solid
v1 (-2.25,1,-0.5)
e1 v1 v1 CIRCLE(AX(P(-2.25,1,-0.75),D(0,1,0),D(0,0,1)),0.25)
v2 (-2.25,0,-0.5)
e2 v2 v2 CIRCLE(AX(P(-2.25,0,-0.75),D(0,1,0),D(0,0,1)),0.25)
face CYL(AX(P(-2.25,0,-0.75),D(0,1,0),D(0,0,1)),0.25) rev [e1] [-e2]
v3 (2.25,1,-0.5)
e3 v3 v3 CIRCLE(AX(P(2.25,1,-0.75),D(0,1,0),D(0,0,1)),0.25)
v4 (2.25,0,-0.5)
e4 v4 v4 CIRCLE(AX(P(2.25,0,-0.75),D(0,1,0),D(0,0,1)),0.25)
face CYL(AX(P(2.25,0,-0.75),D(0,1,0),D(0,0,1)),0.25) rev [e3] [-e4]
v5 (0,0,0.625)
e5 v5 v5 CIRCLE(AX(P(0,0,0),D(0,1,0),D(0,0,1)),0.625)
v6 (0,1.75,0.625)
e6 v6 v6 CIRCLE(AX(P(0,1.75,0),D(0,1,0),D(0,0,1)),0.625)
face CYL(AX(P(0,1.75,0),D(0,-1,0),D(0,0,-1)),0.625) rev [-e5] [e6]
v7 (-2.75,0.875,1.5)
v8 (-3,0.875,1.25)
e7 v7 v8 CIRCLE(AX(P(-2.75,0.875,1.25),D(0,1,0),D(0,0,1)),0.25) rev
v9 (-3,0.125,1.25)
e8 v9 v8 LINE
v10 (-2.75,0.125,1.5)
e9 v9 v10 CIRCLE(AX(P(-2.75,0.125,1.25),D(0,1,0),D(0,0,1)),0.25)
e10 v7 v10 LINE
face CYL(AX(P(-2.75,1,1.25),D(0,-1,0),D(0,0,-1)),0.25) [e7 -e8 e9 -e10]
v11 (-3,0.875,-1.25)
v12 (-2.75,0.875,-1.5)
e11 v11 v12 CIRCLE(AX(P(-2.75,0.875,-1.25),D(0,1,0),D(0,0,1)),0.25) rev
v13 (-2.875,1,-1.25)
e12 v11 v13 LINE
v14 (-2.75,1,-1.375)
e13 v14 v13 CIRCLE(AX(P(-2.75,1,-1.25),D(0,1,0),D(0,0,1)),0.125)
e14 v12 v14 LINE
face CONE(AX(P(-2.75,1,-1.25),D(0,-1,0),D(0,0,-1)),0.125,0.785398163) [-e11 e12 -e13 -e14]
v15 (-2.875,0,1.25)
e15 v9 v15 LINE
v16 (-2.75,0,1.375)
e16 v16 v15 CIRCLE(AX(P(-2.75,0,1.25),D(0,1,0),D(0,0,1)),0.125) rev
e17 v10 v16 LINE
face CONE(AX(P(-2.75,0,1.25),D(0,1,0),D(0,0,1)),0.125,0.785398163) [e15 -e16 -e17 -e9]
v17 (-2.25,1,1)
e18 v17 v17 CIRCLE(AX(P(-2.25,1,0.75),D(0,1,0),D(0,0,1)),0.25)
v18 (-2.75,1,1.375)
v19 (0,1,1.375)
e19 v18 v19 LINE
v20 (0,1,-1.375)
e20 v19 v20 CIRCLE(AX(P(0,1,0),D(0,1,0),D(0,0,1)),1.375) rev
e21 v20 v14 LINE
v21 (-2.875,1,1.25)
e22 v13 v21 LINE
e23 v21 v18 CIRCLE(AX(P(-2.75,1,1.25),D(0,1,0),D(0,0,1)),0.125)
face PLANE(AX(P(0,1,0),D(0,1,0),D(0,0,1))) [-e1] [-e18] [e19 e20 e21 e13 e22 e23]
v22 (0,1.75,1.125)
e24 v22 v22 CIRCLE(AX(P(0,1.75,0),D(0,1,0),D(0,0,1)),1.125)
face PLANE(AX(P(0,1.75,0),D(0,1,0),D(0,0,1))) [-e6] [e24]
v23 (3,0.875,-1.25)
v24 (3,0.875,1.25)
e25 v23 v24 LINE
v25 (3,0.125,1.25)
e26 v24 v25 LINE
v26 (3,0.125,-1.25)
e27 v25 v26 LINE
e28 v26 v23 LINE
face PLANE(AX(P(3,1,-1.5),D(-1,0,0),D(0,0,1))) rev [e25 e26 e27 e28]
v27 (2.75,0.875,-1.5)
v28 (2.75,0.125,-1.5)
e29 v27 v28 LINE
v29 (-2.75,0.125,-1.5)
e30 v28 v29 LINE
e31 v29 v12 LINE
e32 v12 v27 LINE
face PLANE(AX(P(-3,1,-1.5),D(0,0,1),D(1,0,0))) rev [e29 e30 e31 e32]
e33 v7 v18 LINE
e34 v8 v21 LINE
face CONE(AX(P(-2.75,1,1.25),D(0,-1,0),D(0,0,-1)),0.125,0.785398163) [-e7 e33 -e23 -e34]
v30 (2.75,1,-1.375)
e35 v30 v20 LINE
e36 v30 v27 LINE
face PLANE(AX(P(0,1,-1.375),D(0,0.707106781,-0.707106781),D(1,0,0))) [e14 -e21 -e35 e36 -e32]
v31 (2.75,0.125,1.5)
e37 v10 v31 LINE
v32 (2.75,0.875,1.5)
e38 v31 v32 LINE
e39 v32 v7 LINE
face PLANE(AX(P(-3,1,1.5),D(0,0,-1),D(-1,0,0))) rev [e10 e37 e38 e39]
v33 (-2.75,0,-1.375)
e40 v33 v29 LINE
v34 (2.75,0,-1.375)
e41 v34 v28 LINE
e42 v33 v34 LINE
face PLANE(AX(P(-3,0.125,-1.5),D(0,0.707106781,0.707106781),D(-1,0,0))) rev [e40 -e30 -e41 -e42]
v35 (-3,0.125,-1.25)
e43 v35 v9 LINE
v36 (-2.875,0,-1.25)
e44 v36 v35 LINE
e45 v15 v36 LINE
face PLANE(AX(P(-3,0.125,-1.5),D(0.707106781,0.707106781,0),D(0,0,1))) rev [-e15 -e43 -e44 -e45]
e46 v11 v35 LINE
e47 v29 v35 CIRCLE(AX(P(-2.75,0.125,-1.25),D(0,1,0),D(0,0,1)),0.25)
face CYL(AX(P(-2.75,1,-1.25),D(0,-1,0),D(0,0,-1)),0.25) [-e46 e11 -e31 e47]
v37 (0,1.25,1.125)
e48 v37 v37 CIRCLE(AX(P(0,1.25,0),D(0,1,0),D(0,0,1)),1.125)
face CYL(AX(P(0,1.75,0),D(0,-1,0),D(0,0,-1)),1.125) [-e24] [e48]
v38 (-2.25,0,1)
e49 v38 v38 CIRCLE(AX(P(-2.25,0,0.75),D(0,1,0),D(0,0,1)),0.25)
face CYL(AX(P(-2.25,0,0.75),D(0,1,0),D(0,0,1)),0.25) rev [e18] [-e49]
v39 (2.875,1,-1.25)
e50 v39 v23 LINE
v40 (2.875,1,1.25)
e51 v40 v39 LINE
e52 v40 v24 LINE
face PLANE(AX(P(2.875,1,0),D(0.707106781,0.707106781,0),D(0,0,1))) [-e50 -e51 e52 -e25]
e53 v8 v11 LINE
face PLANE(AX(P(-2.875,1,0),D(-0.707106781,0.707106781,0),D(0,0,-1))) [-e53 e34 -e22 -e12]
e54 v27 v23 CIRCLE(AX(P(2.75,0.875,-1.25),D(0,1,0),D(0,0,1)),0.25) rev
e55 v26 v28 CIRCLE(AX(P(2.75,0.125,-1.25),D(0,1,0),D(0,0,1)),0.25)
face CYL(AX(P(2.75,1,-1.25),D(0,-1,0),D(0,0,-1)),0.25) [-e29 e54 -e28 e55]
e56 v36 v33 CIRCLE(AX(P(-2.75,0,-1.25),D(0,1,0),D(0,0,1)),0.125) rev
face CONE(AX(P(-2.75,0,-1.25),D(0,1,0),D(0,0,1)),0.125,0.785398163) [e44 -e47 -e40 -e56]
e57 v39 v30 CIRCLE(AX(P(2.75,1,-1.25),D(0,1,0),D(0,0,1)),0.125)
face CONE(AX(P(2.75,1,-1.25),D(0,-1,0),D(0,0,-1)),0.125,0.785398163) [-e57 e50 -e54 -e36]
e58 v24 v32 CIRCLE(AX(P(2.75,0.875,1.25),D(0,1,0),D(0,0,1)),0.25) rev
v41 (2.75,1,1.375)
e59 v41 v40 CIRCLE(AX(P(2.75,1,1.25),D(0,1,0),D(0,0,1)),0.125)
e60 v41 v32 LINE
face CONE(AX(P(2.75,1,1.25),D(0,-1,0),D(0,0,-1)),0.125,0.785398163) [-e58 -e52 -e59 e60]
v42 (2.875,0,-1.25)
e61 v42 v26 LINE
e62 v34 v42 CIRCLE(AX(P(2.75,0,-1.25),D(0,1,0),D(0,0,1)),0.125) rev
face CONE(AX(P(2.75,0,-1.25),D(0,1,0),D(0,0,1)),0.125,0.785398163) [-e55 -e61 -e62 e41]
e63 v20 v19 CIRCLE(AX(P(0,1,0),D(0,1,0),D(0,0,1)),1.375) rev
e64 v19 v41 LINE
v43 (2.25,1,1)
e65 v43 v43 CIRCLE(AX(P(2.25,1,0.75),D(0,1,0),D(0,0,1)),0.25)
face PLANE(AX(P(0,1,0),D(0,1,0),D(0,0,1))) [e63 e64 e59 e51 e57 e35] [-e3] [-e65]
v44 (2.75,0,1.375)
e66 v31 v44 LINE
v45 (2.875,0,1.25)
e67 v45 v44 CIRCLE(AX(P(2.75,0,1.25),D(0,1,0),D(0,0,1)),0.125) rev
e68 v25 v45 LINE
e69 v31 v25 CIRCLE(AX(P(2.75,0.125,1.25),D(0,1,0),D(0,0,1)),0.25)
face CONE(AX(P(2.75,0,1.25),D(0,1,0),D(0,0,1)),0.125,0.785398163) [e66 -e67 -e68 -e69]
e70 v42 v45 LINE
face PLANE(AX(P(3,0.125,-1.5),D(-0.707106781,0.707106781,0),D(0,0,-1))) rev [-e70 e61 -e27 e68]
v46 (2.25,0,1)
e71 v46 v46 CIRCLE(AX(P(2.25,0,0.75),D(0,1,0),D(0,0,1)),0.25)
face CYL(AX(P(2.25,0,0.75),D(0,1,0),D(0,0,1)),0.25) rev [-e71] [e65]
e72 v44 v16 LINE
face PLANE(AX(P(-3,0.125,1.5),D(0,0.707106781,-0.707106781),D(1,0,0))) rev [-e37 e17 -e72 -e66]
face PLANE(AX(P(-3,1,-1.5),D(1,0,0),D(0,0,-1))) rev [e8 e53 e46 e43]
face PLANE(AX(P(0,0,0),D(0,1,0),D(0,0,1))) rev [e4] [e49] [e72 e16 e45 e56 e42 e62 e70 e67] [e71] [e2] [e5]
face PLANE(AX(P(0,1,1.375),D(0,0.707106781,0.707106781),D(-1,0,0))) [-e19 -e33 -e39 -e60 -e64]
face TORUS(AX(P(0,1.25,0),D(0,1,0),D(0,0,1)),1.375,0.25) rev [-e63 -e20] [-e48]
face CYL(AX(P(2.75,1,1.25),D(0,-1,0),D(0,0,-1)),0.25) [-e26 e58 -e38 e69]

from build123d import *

# Parameters (mm, degrees)
SKETCH1_W           = 6
SKETCH1_H           = 3
BOSS_EXTRUDE1_DEPTH = 1
SKETCH3_R           = 1.125
BOSS_EXTRUDE3_DEPTH = 0.75
SKETCH5_R           = 0.625
CUT_EXTRUDE3_DEPTH  = 4.783186488
FILLET1_R           = 0.25
SKETCH6_R           = 0.25
CUT_EXTRUDE4_DEPTH  = 4.5
FILLET3_R           = 0.25
CHAMFER2_SIZE       = 0.125


with BuildPart() as part:
    # Sketch1 → Boss-Extrude1 (new body)
    with BuildSketch(Plane(origin=(0, 0, 0), x_dir=(1, 0, 0), z_dir=(0, 1, 0))):
        Rectangle(SKETCH1_W, SKETCH1_H)
    extrude(amount=BOSS_EXTRUDE1_DEPTH)

    # Sketch3 → Boss-Extrude3 (add)
    with BuildSketch(Plane(origin=(0, 1, 0), x_dir=(1, 0, 0), z_dir=(0, 1, 0))):
        with Locations(Location((0, 0, 0), (0, 0, 270))):
            Circle(SKETCH3_R)
    extrude(amount=BOSS_EXTRUDE3_DEPTH)

    # Sketch5 → Cut-Extrude3 (cut, through all)
    with BuildSketch(Plane(origin=(0, 0, 0), x_dir=(1, 0, 0), z_dir=(0, 1, 0))):
        with Locations(Location((0, 0, 0), (0, 0, 270))):
            Circle(SKETCH5_R)
    extrude(amount=CUT_EXTRUDE3_DEPTH, mode=Mode.SUBTRACT)

    # Fillet1
    fillet1_edges = [part.edges().sort_by_distance(p)[0] for p in [
        (0, 1, -1.125),
    ]]
    fillet(fillet1_edges, radius=FILLET1_R)

    # Sketch6 → Cut-Extrude4 (cut, through all)
    with BuildSketch(Plane(origin=(0, 1, 0), x_dir=(1, 0, 0), z_dir=(0, 1, 0))):
        with Locations(Location((2.25, -0.75, 0), (0, 0, 270))):
            Circle(SKETCH6_R)
        with Locations(Location((2.25, 0.75, 0), (0, 0, 270))):
            Circle(SKETCH6_R)
        with Locations(Location((-2.25, 0.75, 0), (0, 0, 270))):
            Circle(SKETCH6_R)
        with Locations(Location((-2.25, -0.75, 0), (0, 0, 270))):
            Circle(SKETCH6_R)
    extrude(amount=-CUT_EXTRUDE4_DEPTH, mode=Mode.SUBTRACT)

    # Fillet3
    fillet3_edges = [part.edges().sort_by_distance(p)[0] for p in [
        (3, 0.5, 1.5),
        (-3, 0.5, 1.5),
        (-3, 0.5, -1.5),
        (3, 0.5, -1.5),
    ]]
    fillet(fillet3_edges, radius=FILLET3_R)

    # Chamfer2
    chamfer2_edges = [part.edges().sort_by_distance(p)[0] for p in [
        (0, 0, -1.5),
        (0, 1, -1.5),
        (3, 0, 0),
        (0, 0, 1.5),
        (-3, 0, 0),
        (-2.926776695, 0, -1.426776695),
        (-2.926776695, 0, 1.426776695),
        (2.926776695, 0, 1.426776695),
        (2.926776695, 0, -1.426776695),
        (3, 1, 0),
        (-3, 1, 0),
        (0, 1, 1.5),
        (-2.926776695, 1, -1.426776695),
        (-2.926776695, 1, 1.426776695),
        (2.926776695, 1, 1.426776695),
        (2.926776695, 1, -1.426776695),
    ]]
    chamfer(chamfer2_edges, length=CHAMFER2_SIZE - 0.0001)  # a hair under: the kernel refuses the full size


solid = part.part
